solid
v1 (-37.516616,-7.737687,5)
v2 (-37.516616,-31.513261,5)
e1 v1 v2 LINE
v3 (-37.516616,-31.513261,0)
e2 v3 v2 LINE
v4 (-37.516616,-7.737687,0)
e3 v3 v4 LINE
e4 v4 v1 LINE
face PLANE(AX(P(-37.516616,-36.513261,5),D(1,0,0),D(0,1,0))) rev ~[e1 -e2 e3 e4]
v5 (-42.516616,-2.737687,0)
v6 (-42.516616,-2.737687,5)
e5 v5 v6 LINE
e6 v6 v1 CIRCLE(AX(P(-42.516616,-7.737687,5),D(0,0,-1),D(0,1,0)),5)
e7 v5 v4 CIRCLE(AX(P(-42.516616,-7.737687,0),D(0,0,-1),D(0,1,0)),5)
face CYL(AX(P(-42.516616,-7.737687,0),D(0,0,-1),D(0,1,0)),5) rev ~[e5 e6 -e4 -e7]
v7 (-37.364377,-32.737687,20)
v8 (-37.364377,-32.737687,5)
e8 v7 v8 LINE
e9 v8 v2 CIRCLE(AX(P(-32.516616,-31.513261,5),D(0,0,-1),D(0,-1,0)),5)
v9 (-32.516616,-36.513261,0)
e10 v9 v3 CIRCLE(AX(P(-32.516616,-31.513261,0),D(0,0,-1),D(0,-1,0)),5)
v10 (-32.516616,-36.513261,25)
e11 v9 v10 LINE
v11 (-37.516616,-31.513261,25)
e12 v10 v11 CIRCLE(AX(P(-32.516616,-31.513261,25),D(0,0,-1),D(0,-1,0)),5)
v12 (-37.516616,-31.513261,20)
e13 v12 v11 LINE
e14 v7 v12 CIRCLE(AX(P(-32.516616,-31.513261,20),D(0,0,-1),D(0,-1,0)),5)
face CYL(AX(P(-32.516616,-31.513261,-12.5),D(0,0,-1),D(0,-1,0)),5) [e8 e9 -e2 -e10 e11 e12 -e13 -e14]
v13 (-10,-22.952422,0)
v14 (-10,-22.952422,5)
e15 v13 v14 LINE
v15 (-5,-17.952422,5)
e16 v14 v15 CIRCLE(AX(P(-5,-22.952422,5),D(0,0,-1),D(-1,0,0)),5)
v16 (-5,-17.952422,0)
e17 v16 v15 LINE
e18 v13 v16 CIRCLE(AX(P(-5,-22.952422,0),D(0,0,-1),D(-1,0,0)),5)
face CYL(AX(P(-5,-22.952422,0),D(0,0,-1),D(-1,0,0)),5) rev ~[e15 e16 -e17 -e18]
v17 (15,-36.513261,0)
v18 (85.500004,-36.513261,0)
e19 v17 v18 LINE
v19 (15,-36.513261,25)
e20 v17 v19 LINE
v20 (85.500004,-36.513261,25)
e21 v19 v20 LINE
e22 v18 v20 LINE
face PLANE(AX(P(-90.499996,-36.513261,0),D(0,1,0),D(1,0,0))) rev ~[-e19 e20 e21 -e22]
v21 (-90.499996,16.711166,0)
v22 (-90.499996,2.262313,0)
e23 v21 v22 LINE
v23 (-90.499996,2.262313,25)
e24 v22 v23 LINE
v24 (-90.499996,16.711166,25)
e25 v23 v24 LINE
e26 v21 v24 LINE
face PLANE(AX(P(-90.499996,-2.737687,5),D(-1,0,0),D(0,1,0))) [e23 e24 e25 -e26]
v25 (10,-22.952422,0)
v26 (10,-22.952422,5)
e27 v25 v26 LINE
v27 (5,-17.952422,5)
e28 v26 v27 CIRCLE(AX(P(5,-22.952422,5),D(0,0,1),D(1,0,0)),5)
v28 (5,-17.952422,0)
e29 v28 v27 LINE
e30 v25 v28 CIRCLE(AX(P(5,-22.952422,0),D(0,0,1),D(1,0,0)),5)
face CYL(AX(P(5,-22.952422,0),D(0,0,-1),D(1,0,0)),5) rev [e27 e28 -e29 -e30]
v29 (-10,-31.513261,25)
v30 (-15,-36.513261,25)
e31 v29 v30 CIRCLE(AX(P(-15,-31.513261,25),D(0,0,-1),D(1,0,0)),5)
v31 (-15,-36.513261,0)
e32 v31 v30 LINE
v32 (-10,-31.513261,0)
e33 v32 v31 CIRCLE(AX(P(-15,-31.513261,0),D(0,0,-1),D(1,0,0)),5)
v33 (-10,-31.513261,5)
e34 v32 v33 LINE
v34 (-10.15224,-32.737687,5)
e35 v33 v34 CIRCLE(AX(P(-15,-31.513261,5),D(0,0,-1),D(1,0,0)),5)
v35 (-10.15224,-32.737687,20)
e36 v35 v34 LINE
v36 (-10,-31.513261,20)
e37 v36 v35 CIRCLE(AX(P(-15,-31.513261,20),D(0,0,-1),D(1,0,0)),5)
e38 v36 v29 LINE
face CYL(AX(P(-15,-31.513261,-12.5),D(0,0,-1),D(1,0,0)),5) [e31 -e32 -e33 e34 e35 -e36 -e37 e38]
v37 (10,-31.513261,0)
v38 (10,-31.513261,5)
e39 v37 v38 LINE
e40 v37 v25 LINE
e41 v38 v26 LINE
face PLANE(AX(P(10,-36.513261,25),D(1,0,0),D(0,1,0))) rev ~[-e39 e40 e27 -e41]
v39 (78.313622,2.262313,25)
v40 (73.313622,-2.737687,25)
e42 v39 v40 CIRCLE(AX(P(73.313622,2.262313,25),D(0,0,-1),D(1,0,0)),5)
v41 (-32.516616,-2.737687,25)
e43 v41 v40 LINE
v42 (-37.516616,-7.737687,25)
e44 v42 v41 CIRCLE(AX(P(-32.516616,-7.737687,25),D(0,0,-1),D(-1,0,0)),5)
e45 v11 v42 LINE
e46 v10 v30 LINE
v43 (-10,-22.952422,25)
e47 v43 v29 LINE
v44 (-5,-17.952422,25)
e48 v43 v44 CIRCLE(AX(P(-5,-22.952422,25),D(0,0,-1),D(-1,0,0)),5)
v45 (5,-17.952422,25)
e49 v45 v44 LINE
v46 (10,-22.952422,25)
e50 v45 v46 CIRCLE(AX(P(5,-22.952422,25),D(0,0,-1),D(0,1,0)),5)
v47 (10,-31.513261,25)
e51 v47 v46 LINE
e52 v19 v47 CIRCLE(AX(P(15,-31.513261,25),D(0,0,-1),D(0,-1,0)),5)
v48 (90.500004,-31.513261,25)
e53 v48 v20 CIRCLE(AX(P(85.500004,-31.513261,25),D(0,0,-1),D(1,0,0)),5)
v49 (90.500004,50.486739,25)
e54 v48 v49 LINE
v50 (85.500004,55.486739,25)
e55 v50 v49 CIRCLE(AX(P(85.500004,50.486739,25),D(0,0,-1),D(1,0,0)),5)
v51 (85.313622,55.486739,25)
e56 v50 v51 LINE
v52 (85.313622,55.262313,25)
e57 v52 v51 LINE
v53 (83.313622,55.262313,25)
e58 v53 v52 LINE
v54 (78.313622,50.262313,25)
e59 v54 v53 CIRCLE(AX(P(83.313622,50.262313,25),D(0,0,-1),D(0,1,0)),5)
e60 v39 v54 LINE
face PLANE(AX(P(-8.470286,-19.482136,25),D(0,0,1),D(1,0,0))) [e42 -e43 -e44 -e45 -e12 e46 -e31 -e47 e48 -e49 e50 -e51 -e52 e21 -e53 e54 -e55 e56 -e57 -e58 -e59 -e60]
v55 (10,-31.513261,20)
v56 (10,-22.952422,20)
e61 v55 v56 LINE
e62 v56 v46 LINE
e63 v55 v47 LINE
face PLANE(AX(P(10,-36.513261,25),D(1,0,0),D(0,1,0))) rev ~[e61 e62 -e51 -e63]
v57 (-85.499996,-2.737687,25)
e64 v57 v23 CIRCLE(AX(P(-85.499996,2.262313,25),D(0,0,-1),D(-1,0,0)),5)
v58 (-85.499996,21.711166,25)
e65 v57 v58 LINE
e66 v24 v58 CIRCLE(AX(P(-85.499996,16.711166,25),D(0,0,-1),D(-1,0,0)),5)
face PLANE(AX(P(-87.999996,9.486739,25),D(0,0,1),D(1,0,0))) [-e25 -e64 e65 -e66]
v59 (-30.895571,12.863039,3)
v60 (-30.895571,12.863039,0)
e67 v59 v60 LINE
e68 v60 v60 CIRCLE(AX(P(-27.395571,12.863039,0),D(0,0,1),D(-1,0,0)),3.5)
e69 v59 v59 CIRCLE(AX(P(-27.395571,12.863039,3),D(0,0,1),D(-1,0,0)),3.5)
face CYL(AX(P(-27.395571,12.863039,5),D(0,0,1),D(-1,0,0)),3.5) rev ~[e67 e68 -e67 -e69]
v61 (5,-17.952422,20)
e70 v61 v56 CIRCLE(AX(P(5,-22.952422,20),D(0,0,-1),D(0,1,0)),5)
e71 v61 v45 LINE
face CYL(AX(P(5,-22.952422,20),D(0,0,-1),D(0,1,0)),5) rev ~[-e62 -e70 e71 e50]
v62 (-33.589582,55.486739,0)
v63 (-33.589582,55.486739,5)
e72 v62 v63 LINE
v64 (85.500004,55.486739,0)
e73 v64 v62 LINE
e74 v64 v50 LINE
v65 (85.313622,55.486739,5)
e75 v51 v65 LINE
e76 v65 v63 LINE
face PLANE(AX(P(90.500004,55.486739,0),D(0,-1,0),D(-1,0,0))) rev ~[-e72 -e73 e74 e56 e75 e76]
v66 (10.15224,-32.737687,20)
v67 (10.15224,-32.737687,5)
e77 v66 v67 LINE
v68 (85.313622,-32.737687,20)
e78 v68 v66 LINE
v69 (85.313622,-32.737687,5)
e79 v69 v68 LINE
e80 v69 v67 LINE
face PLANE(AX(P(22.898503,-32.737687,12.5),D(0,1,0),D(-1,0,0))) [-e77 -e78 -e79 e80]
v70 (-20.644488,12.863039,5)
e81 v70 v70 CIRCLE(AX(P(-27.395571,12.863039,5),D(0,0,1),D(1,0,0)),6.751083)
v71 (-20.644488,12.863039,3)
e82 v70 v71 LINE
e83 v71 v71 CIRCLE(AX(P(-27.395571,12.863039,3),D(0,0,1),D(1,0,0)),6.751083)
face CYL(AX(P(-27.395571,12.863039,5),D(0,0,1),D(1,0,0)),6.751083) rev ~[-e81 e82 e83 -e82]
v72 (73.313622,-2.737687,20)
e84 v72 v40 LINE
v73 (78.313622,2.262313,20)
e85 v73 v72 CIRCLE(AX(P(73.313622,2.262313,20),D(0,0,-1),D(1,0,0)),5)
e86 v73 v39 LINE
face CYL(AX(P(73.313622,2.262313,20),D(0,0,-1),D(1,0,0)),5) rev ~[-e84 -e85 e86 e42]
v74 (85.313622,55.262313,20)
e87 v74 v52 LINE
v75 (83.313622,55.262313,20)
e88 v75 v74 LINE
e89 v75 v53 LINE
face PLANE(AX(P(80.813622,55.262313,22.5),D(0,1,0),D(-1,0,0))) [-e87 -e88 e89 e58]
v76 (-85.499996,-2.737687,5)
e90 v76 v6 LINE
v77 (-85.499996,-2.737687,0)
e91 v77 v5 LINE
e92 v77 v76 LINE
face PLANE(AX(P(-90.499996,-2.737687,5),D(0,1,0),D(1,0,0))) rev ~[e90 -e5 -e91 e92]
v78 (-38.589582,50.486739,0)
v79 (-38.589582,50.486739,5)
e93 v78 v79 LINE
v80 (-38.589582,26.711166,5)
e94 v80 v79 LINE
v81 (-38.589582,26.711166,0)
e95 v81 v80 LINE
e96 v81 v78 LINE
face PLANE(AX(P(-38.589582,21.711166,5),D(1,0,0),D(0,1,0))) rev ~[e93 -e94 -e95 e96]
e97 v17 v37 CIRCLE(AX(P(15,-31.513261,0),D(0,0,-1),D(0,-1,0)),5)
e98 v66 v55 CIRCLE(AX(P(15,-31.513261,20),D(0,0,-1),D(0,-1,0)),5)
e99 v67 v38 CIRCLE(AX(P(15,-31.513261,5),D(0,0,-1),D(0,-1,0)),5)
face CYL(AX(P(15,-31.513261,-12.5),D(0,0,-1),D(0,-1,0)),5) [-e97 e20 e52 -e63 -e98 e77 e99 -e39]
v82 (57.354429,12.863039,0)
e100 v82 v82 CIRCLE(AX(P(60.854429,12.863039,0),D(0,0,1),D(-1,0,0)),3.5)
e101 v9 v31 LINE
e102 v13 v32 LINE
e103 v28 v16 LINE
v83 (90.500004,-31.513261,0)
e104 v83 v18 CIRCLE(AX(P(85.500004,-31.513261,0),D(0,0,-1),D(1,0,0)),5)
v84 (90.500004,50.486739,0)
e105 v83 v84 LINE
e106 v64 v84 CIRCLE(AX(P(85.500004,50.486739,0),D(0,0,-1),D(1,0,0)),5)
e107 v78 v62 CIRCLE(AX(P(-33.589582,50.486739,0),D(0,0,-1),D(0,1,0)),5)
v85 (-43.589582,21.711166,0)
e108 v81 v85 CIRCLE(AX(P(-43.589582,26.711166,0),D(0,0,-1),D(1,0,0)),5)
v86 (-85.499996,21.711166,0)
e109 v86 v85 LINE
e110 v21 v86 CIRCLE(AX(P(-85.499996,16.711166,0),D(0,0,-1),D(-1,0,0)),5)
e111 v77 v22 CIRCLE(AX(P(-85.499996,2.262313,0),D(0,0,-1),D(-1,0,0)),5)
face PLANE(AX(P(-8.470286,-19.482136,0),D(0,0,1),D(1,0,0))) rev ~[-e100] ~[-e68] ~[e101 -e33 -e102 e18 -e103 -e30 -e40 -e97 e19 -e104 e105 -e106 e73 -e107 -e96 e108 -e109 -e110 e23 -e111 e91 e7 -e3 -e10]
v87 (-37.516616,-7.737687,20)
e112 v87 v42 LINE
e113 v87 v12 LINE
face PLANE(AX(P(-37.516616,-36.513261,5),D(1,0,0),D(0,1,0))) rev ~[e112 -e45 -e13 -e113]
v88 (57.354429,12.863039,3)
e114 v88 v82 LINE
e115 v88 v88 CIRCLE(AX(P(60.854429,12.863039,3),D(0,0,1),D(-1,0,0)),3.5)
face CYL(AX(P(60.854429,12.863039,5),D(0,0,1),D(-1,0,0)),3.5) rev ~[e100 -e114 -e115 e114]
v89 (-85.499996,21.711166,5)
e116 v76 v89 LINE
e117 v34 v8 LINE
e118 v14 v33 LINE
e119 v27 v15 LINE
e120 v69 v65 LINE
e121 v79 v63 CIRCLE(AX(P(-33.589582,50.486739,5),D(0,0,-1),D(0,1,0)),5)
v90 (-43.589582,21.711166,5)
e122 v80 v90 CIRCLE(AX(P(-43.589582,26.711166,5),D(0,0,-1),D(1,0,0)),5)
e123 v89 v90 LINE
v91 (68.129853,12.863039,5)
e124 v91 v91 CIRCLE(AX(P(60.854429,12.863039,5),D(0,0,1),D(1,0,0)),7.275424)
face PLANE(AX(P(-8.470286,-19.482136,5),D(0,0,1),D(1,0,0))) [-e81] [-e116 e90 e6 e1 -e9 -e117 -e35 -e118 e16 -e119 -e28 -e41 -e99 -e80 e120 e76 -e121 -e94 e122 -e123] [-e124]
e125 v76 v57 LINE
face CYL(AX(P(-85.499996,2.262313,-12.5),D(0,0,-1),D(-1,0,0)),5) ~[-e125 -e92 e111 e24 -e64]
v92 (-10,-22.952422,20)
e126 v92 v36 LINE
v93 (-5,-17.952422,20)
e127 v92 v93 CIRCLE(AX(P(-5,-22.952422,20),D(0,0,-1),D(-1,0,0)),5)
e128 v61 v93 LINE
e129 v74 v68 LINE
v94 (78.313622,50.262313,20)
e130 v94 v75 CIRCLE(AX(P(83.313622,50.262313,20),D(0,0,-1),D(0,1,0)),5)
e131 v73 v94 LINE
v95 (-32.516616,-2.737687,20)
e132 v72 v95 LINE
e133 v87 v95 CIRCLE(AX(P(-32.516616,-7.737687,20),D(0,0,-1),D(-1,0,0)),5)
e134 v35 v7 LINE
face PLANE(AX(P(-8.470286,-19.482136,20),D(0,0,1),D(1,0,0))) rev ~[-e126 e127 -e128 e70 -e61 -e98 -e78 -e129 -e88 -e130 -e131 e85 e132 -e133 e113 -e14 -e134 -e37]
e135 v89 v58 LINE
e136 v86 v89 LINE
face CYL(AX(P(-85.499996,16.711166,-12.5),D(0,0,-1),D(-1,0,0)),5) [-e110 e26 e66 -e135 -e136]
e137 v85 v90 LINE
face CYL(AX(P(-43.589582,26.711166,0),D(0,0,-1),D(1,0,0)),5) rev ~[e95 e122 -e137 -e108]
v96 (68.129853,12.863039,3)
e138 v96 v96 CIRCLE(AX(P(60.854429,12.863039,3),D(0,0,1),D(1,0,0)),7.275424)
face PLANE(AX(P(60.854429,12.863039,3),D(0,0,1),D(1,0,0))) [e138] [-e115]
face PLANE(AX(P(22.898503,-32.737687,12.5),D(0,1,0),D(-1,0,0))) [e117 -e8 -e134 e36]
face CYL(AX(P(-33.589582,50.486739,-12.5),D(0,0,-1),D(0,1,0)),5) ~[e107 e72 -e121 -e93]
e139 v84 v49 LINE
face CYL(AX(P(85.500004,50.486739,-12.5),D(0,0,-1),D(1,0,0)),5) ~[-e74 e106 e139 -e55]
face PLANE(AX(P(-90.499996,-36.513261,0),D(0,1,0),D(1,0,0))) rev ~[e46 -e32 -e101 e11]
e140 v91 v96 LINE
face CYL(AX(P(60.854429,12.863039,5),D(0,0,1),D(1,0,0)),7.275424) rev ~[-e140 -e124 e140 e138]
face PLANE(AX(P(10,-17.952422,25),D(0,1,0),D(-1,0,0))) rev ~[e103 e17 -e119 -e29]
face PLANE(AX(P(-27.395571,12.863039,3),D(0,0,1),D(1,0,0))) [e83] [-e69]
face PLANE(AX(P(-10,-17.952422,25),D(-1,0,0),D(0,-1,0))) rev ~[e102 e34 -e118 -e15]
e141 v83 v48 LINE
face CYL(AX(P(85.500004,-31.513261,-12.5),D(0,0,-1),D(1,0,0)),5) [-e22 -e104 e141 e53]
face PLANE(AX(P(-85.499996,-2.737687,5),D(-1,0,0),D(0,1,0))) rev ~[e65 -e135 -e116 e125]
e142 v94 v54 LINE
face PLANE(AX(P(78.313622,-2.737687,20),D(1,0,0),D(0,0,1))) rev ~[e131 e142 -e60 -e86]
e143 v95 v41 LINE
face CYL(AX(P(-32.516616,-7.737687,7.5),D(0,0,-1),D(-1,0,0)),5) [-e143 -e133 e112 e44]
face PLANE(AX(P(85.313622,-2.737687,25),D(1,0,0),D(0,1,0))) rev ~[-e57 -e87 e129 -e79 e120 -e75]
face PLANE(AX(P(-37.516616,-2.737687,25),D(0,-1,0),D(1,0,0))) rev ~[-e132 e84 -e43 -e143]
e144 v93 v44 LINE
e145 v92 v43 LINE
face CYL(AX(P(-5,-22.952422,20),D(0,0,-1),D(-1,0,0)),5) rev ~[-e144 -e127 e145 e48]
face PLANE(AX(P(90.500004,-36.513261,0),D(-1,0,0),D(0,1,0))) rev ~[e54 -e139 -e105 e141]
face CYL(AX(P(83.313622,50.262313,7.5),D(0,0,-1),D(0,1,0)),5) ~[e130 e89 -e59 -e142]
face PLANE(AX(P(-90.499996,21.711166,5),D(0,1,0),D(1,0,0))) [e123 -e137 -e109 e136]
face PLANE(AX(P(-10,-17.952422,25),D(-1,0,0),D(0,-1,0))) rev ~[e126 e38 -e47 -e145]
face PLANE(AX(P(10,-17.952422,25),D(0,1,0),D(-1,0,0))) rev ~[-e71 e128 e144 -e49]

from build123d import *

# Parameters (mm, degrees)
F1_DEPTH     = 25
F4_DEPTH     = 25
F6_DEPTH     = 20
F7_W         = 51.9104144033
F7_H         = 33.7755738664
F7_W_2       = 52.9833799657
F8_DEPTH     = 25
F9_W         = 5
F9_H         = 24.4488522671
F10_DEPTH    = 20
F11_W        = 120.8302378654
F11_H        = 15
F12_DEPTH    = 30
F14_DEPTH    = 6
F15_R        = 7.2754238601
F15_R_2      = 3.5
F15_R_3      = 6.751082942
F16_DEPTH    = 2
F17_W        = 5
F17_H        = 5
F18_DEPTH    = 58
F19_DEPTH    = 2
F20_T1_DEPTH = 5
F20_T3_DEPTH = 5
F20_T5_DEPTH = 50
F20_T7_DEPTH = 30
F20_T9_DEPTH = 30


# Not quite as in the source:
# - a fillet or chamfer that OpenCascade refuses, or shapes differently, is made with other operations: its cross-section is extruded or revolved along the edge and cut away or added
# - a feature names something its author has since deleted; it is built from what else it names


with BuildPart() as f1:
    # F0 (on Top) → F1 (new body)
    with BuildSketch(Plane.XY):
        Polygon((-25, 55.486739397), (-90.4999962505, 55.486739397), (-90.4999962505, -36.513260603), (90.5000037495, -36.513260603), (90.5000037495, 55.486739397), (25, 55.486739397), align=None)
    extrude(amount=F1_DEPTH)

    # F3 (on face) → F4 (cut)
    with BuildSketch(Plane.XY.offset(25)):
        Polygon((10, -17.952421695), (0, -17.952421695), (-10, -17.952421695), (-10, -30.3189372783), (0, -30.3189372783), (10, -30.3189372783), align=None)
        Polygon((10, -36.513260603), (10, -30.3189372783), (0, -30.3189372783), (-10, -30.3189372783), (-10, -36.513260603), align=None)
    extrude(amount=-F4_DEPTH, mode=Mode.SUBTRACT)

    # F5 (on face) → F6 (cut)
    with BuildSketch(Plane.XY.offset(25)):
        Polygon((83.3136215806, -2.7376867365), (83.3136215806, 55.486739397), (-90.4999962505, 55.486739397), (-90.4999962505, -36.513260603), (-37.5166162848, -36.513260603), (-37.5166162848, -2.7376867365), align=None)
    extrude(amount=-F6_DEPTH, mode=Mode.SUBTRACT)

    # F7 (on face) → F8 (cut)
    with BuildSketch(Plane.XY.offset(5)):
        with Locations((-64.5447890489, 38.5989524638)):
            Rectangle(F7_W, F7_H)
        with Locations((-64.0083062677, -19.6254736697)):
            Rectangle(F7_W_2, F7_H)
    extrude(amount=-F8_DEPTH, mode=Mode.SUBTRACT)

    # F9 (on face) → F10 (join)
    with BuildSketch(Plane.XY.offset(5)):
        with Locations((-87.9999962505, 9.486739397)):
            Rectangle(F9_W, F9_H)
    extrude(amount=F10_DEPTH)

    # F11 (on face) → F12 (cut)
    with BuildSketch(Plane(origin=(0, -2.7376867365, 0), x_dir=(-1, 0, 0), z_dir=(0, 1, 0))):
        with Locations((-22.8985026479, 12.5)):
            Rectangle(F11_W, F11_H)
    extrude(amount=-F12_DEPTH, mode=Mode.SUBTRACT)

    # F13 (on face) → F14 (cut)
    with BuildSketch(Plane.XY.offset(5)):
        with BuildLine():
            ThreePointArc((64.3544293493, 12.8630390391), (60.8544293493, 16.3630390391), (57.3544293493, 12.8630390391))
            Line((57.3544293493, 12.8630390391), (60.8544293493, 12.8630390391))
            Line((60.8544293493, 12.8630390391), (64.3544293493, 12.8630390391))
        make_face()
        with BuildLine():
            Line((60.8544293493, 12.8630390391), (57.3544293493, 12.8630390391))
            ThreePointArc((57.3544293493, 12.8630390391), (60.8544293493, 9.3630390391), (64.3544293493, 12.8630390391))
            Line((64.3544293493, 12.8630390391), (60.8544293493, 12.8630390391))
        make_face()
        with BuildLine():
            ThreePointArc((-23.8955706507, 12.8630390391), (-27.3955706507, 16.3630390391), (-30.8955706507, 12.8630390391))
            Line((-30.8955706507, 12.8630390391), (-27.3955706507, 12.8630390391))
            Line((-27.3955706507, 12.8630390391), (-23.8955706507, 12.8630390391))
        make_face()
        with BuildLine():
            Line((-27.3955706507, 12.8630390391), (-30.8955706507, 12.8630390391))
            ThreePointArc((-30.8955706507, 12.8630390391), (-27.3955706507, 9.3630390391), (-23.8955706507, 12.8630390391))
            Line((-23.8955706507, 12.8630390391), (-27.3955706507, 12.8630390391))
        make_face()
    extrude(amount=-F14_DEPTH, mode=Mode.SUBTRACT)

    # F15 (on face) → F16 (cut)
    with BuildSketch(Plane.XY.offset(5)):
        with Locations((60.8544293493, 12.8630390391)):
            Circle(F15_R)
        with Locations((60.8544293493, 12.8630390391)):
            Circle(F15_R_2, mode=Mode.SUBTRACT)
        with Locations((-27.3955706507, 12.8630390391)):
            Circle(F15_R_3)
        with Locations((-27.3955706507, 12.8630390391)):
            Circle(F15_R_2, mode=Mode.SUBTRACT)
    extrude(amount=-F16_DEPTH, mode=Mode.SUBTRACT)

    # F17 (on face) → F18 (join)
    with BuildSketch(Plane(origin=(0, -2.7376867365, 0), x_dir=(-1, 0, 0), z_dir=(0, 1, 0))):
        with Locations((-80.8136215806, 22.5)):
            Rectangle(F17_W, F17_H)
    extrude(amount=F18_DEPTH)

    # F19 (cut): a face of the model
    f19_faces = [f1.faces().sort_by_distance(p)[0] for p in [
        (83.3136215806, 11.4118039273, 12.5084721811),
    ]]
    extrude(f19_faces, amount=-F19_DEPTH, mode=Mode.SUBTRACT)

    # F20: fillet of radius 5 on 17 edges, made by hand

    # F20_s2 → F20_t1 (join)
    with BuildSketch(Plane.XY.offset(20)):
        with BuildLine():
            ThreePointArc((-10, -22.952421695), (-8.5355339059, -19.4168877891), (-5, -17.952421695))
            Line((-5, -17.952421695), (-10, -17.952421695))
            Line((-10, -17.952421695), (-10, -22.952421695))
        make_face()
        with BuildLine():
            ThreePointArc((5, -17.952421695), (8.5355339059, -19.4168877891), (10, -22.952421695))
            Line((10, -22.952421695), (10, -17.952421695))
            Line((10, -17.952421695), (5, -17.952421695))
        make_face()
        with BuildLine():
            ThreePointArc((78.3136215806, 2.2623132635), (76.8491554865, -1.2732206424), (73.3136215806, -2.7376867365))
            Line((73.3136215806, -2.7376867365), (78.3136215806, -2.7376867365))
            Line((78.3136215806, -2.7376867365), (78.3136215806, 2.2623132635))
        make_face()
    extrude(amount=F20_T1_DEPTH)

    # F20_s4 → F20_t3 (join)
    with BuildSketch(Plane.XY):
        with BuildLine():
            ThreePointArc((-10, -22.952421695), (-8.5355339059, -19.4168877891), (-5, -17.952421695))
            Line((-5, -17.952421695), (-10, -17.952421695))
            Line((-10, -17.952421695), (-10, -22.952421695))
        make_face()
        with BuildLine():
            ThreePointArc((10, -22.952421695), (8.5355339059, -19.4168877891), (5, -17.952421695))
            Line((5, -17.952421695), (10, -17.952421695))
            Line((10, -17.952421695), (10, -22.952421695))
        make_face()
        with BuildLine():
            ThreePointArc((-42.5166162848, -2.7376867365), (-38.9810823789, -4.2021528306), (-37.5166162848, -7.7376867365))
            Line((-37.5166162848, -7.7376867365), (-37.5166162848, -2.7376867365))
            Line((-37.5166162848, -2.7376867365), (-42.5166162848, -2.7376867365))
        make_face()
        with BuildLine():
            ThreePointArc((-38.5895818472, 26.7111655306), (-40.0540479413, 23.1756316247), (-43.5895818472, 21.7111655306))
            Line((-43.5895818472, 21.7111655306), (-38.5895818472, 21.7111655306))
            Line((-38.5895818472, 21.7111655306), (-38.5895818472, 26.7111655306))
        make_face()
    extrude(amount=F20_T3_DEPTH)

    # F20_s6 → F20_t5 (cut)
    with BuildSketch(Plane.XY.offset(-12.5)):
        with BuildLine():
            ThreePointArc((-10, -31.513260603), (-11.4644660941, -35.0487945089), (-15, -36.513260603))
            Line((-15, -36.513260603), (-10, -36.513260603))
            Line((-10, -36.513260603), (-10, -31.513260603))
        make_face()
        with BuildLine():
            ThreePointArc((15, -36.513260603), (11.4644660941, -35.0487945089), (10, -31.513260603))
            Line((10, -31.513260603), (10, -36.513260603))
            Line((10, -36.513260603), (15, -36.513260603))
        make_face()
        with BuildLine():
            ThreePointArc((-32.5166162848, -36.513260603), (-36.0521501908, -35.0487945089), (-37.5166162848, -31.513260603))
            Line((-37.5166162848, -31.513260603), (-37.5166162848, -36.513260603))
            Line((-37.5166162848, -36.513260603), (-32.5166162848, -36.513260603))
        make_face()
        with BuildLine():
            ThreePointArc((90.5000037495, 50.486739397), (89.0355376554, 54.022273303), (85.5000037495, 55.486739397))
            Line((85.5000037495, 55.486739397), (90.5000037495, 55.486739397))
            Line((90.5000037495, 55.486739397), (90.5000037495, 50.486739397))
        make_face()
        with BuildLine():
            ThreePointArc((90.5000037495, -31.513260603), (89.0355376554, -35.0487945089), (85.5000037495, -36.513260603))
            Line((85.5000037495, -36.513260603), (90.5000037495, -36.513260603))
            Line((90.5000037495, -36.513260603), (90.5000037495, -31.513260603))
        make_face()
        with BuildLine():
            ThreePointArc((-90.4999962505, 16.7111655306), (-89.0355301565, 20.2466994365), (-85.4999962505, 21.7111655306))
            Line((-85.4999962505, 21.7111655306), (-90.4999962505, 21.7111655306))
            Line((-90.4999962505, 21.7111655306), (-90.4999962505, 16.7111655306))
        make_face()
        with BuildLine():
            ThreePointArc((-90.4999962505, 2.2623132635), (-89.0355301565, -1.2732206424), (-85.4999962505, -2.7376867365))
            Line((-85.4999962505, -2.7376867365), (-90.4999962505, -2.7376867365))
            Line((-90.4999962505, -2.7376867365), (-90.4999962505, 2.2623132635))
        make_face()
    extrude(amount=F20_T5_DEPTH, mode=Mode.SUBTRACT)

    # F20_s8 → F20_t7 (cut)
    with BuildSketch(Plane.XY.offset(-12.5)):
        with BuildLine():
            ThreePointArc((-33.5895818472, 55.486739397), (-37.1251157531, 54.022273303), (-38.5895818472, 50.486739397))
            Line((-38.5895818472, 50.486739397), (-38.5895818472, 55.486739397))
            Line((-38.5895818472, 55.486739397), (-33.5895818472, 55.486739397))
        make_face()
    extrude(amount=F20_T7_DEPTH, mode=Mode.SUBTRACT)

    # F20_s10 → F20_t9 (cut)
    with BuildSketch(Plane.XY.offset(7.5)):
        with BuildLine():
            ThreePointArc((83.3136215806, 55.2623132635), (79.7780876747, 53.7978471694), (78.3136215806, 50.2623132635))
            Line((78.3136215806, 50.2623132635), (78.3136215806, 55.2623132635))
            Line((78.3136215806, 55.2623132635), (83.3136215806, 55.2623132635))
        make_face()
        with BuildLine():
            ThreePointArc((-37.5166162848, -7.7376867365), (-36.0521501908, -4.2021528306), (-32.5166162848, -2.7376867365))
            Line((-32.5166162848, -2.7376867365), (-37.5166162848, -2.7376867365))
            Line((-37.5166162848, -2.7376867365), (-37.5166162848, -7.7376867365))
        make_face()
    extrude(amount=F20_T9_DEPTH, mode=Mode.SUBTRACT)


solid = f1.part
